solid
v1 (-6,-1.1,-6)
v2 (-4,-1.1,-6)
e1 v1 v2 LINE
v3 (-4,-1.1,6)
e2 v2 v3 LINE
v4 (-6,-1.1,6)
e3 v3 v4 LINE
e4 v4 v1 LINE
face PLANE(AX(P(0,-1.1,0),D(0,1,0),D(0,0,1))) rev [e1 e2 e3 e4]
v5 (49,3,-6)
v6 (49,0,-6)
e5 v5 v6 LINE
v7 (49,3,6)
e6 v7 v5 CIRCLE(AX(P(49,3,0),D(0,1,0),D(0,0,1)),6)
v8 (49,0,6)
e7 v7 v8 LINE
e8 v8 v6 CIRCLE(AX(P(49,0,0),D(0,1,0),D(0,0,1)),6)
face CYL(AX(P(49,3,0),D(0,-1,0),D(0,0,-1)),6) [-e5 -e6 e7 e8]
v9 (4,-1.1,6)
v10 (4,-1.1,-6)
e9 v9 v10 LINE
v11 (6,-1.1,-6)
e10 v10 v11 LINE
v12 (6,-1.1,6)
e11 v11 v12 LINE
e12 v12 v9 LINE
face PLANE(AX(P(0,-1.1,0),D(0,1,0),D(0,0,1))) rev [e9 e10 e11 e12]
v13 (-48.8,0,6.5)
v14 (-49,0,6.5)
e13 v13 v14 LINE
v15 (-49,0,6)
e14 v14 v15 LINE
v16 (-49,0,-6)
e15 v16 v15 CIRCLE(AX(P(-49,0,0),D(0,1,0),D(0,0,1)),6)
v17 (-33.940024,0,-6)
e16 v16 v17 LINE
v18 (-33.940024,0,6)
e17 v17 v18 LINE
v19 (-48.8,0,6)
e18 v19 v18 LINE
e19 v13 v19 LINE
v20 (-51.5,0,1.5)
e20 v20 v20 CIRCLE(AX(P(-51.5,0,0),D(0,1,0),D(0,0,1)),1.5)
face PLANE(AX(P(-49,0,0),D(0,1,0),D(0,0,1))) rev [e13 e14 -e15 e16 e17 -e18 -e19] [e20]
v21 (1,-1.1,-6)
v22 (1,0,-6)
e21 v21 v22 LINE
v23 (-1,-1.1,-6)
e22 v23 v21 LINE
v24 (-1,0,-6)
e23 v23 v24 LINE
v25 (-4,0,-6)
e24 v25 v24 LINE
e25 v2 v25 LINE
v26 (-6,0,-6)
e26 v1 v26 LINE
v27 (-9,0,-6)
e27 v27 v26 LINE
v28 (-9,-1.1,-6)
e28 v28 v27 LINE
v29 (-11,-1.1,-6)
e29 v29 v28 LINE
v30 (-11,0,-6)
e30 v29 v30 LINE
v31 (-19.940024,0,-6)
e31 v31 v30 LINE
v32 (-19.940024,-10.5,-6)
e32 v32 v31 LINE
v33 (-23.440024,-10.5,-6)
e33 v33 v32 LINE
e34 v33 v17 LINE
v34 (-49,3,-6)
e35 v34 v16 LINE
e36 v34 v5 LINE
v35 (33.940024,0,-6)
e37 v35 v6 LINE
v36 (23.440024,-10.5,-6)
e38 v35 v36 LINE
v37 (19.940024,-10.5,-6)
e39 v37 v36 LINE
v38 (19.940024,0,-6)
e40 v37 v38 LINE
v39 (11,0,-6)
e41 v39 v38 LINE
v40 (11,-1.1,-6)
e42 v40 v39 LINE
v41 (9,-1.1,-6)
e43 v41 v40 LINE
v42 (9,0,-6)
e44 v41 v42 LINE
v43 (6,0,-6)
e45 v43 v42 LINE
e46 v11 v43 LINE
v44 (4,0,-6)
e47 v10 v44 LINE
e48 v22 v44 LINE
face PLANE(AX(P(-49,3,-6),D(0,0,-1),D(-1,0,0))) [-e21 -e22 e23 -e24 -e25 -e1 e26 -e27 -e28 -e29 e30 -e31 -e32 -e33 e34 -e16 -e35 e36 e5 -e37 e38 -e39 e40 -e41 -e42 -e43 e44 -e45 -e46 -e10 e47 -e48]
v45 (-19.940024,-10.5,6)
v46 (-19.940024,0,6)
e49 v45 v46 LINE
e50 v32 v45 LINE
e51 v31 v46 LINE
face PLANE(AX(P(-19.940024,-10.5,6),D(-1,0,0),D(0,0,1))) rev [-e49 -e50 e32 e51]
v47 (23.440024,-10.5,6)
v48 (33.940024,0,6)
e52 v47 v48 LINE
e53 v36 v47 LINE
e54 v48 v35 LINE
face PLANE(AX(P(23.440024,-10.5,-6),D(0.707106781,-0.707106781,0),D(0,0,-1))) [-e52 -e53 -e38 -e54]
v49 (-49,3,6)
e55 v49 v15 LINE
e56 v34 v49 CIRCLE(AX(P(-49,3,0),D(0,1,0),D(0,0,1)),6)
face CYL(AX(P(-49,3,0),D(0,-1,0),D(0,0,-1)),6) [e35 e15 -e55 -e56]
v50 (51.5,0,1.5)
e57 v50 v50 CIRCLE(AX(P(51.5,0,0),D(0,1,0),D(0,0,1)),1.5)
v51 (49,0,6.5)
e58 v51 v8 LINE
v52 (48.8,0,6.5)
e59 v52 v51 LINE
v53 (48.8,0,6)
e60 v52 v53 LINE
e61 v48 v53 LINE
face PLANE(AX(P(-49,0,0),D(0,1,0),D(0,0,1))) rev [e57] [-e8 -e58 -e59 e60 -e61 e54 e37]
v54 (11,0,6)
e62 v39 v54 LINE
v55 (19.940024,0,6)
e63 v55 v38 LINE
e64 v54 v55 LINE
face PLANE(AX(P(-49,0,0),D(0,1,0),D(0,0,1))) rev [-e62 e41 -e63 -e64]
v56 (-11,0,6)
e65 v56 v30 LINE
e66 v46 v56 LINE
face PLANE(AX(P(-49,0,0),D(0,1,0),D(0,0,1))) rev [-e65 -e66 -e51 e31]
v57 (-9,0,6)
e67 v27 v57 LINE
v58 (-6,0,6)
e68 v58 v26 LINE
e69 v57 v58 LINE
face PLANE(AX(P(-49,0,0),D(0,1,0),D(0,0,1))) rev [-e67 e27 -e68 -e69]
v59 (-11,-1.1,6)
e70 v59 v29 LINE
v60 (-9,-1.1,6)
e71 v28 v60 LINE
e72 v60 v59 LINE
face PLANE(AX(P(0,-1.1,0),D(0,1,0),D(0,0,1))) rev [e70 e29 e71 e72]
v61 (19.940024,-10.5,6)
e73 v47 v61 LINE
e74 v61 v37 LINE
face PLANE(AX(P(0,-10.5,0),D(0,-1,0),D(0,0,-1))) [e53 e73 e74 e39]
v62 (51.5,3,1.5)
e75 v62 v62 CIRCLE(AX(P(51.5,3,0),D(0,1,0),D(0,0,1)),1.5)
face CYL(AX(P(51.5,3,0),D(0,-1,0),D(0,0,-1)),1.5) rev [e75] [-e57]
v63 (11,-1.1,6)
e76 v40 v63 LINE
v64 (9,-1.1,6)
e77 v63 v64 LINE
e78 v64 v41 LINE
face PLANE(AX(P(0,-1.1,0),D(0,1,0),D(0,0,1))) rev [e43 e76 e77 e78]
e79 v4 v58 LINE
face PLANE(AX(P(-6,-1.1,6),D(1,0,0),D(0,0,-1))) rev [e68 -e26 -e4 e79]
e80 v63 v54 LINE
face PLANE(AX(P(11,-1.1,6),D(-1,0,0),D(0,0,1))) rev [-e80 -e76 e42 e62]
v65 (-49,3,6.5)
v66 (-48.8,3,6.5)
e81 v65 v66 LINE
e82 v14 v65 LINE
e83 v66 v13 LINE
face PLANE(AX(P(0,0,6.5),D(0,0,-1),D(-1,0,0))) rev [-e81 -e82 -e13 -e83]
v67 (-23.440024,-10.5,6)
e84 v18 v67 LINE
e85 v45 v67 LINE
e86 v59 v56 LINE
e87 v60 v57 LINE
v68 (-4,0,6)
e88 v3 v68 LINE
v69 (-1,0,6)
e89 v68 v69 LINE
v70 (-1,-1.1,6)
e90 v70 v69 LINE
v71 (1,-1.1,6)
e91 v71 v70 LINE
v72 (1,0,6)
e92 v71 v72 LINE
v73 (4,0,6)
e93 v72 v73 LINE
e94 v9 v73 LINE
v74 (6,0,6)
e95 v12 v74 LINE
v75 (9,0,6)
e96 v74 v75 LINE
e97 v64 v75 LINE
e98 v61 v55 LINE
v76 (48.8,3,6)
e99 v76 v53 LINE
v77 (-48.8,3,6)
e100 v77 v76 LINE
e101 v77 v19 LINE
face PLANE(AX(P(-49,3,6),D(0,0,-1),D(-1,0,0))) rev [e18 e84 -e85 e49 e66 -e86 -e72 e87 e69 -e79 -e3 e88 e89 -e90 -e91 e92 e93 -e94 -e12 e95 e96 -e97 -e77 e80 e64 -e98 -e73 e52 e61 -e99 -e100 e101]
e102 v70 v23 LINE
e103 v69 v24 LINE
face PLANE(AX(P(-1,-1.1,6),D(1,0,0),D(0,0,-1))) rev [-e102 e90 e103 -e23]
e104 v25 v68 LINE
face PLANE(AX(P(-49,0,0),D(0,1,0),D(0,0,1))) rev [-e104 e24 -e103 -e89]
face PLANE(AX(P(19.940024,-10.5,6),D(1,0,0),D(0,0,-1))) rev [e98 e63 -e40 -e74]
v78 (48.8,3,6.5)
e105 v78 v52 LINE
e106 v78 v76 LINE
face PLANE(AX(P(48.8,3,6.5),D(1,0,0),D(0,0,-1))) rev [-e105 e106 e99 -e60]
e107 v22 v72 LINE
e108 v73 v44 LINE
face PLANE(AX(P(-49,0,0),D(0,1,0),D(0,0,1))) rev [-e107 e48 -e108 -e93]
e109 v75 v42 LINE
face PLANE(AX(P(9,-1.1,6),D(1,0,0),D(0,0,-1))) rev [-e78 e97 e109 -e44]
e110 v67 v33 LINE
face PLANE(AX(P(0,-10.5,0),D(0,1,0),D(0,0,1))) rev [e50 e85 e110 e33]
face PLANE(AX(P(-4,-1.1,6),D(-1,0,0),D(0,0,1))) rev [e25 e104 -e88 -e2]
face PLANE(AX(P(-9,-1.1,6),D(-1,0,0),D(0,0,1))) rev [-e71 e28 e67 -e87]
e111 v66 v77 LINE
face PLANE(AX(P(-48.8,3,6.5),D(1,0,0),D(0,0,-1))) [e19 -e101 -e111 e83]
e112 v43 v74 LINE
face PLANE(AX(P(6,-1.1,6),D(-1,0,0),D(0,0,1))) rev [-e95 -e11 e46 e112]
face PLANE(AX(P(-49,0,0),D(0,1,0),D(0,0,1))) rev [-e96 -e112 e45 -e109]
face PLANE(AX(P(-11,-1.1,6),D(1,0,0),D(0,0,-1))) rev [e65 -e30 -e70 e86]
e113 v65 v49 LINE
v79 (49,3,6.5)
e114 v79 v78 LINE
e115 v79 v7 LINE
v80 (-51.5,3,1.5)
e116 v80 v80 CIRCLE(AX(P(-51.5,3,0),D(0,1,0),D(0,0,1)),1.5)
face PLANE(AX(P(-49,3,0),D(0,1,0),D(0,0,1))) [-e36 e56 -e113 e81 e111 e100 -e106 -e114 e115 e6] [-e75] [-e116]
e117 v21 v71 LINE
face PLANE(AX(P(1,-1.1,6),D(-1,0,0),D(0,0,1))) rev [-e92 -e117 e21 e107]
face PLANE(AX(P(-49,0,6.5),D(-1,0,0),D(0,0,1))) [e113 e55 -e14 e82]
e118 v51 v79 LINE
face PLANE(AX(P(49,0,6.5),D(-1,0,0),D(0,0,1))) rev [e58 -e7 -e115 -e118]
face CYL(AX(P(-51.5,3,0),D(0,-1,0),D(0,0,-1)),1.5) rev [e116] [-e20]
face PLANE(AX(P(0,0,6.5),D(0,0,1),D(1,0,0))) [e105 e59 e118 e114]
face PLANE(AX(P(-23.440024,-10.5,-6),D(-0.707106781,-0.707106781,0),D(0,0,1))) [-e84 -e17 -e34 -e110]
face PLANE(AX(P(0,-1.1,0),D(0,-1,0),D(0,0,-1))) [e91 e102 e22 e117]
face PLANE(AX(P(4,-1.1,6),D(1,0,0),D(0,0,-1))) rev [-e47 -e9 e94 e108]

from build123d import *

# Parameters (mm, degrees)
SKETCH1_R                 = 1.5
BOSS_EXTRUDE1_DEPTH       = 3
SKETCH4_W                 = 3.5
SKETCH4_H                 = 12
BOSS_EXTRUDE3_DEPTH       = 10.5
SKETCH5_W                 = 2
SKETCH5_H                 = 12
BOSS_EXTRUDE4_DEPTH       = 1.1
SKETCH6_W                 = 0.2
SKETCH6_H                 = 3
BOSS_EXTRUDE5_DEPTH       = 0.5
CHAMFER1_SIZE             = 10.5
F_3_0MM_DOWEL_HOLE1_D     = 3
F_3_0MM_DOWEL_HOLE1_DEPTH = 13.5


with BuildPart() as part:
    # Sketch1 → Boss-Extrude1 (new body)
    with BuildSketch(Plane(origin=(0, 0, 0), x_dir=(1, 0, 0), z_dir=(0, 1, 0))):
        with BuildLine():
            Line((-49, 6), (49, 6))
            ThreePointArc((49, 6), (55, 0), (49, -6))
            Line((49, -6), (-49, -6))
            ThreePointArc((-49, -6), (-55, 0), (-49, 6))
        make_face()
        with Locations(Location((-51.5, 0, 0), (0, 0, 270))):
            Circle(SKETCH1_R, mode=Mode.SUBTRACT)
        with Locations(Location((51.5, 0, 0), (0, 0, 270))):
            Circle(SKETCH1_R, mode=Mode.SUBTRACT)
    extrude(amount=BOSS_EXTRUDE1_DEPTH)

    # Sketch4 → Boss-Extrude3 (add)
    with BuildSketch(Plane.XZ):
        with Locations((-21.690023983, 0)):
            Rectangle(SKETCH4_W, SKETCH4_H)
        with Locations((21.690023983, 0)):
            Rectangle(SKETCH4_W, SKETCH4_H)
    extrude(amount=BOSS_EXTRUDE3_DEPTH)

    # Sketch5 → Boss-Extrude4 (add)
    with BuildSketch(Plane.XZ):
        with Locations((5, 0)):
            Rectangle(SKETCH5_W, SKETCH5_H)
        Rectangle(SKETCH5_W, SKETCH5_H)
        with Locations((10, 0)):
            Rectangle(SKETCH5_W, SKETCH5_H)
        with Locations((-5, 0)):
            Rectangle(SKETCH5_W, SKETCH5_H)
        with Locations((-10, 0)):
            Rectangle(SKETCH5_W, SKETCH5_H)
    extrude(amount=BOSS_EXTRUDE4_DEPTH)

    # Sketch6 → Boss-Extrude5 (add)
    with BuildSketch(Plane.XY.offset(6)):
        with Locations((48.9, 1.5)):
            Rectangle(SKETCH6_W, SKETCH6_H)
        with Locations((-48.9, 1.5)):
            Rectangle(SKETCH6_W, SKETCH6_H)
    extrude(amount=BOSS_EXTRUDE5_DEPTH)

    # Chamfer1
    chamfer1_edges = [part.edges().sort_by_distance(p)[0] for p in [
        (23.440023983, 0, 0),
        (-23.440023983, 0, 0),
    ]]
    chamfer(chamfer1_edges, length=CHAMFER1_SIZE - 0.0001)  # a hair under: the kernel refuses the full size

    # Ø3.0mm Dowel Hole1
    with Locations(Plane(origin=(0, 3, 0), x_dir=(1, 0, 0), z_dir=(0, 1, 0))):
        with Locations((-51.5, 0), (51.5, 0)):
            Hole(F_3_0MM_DOWEL_HOLE1_D / 2, depth=F_3_0MM_DOWEL_HOLE1_DEPTH)


solid = part.part
